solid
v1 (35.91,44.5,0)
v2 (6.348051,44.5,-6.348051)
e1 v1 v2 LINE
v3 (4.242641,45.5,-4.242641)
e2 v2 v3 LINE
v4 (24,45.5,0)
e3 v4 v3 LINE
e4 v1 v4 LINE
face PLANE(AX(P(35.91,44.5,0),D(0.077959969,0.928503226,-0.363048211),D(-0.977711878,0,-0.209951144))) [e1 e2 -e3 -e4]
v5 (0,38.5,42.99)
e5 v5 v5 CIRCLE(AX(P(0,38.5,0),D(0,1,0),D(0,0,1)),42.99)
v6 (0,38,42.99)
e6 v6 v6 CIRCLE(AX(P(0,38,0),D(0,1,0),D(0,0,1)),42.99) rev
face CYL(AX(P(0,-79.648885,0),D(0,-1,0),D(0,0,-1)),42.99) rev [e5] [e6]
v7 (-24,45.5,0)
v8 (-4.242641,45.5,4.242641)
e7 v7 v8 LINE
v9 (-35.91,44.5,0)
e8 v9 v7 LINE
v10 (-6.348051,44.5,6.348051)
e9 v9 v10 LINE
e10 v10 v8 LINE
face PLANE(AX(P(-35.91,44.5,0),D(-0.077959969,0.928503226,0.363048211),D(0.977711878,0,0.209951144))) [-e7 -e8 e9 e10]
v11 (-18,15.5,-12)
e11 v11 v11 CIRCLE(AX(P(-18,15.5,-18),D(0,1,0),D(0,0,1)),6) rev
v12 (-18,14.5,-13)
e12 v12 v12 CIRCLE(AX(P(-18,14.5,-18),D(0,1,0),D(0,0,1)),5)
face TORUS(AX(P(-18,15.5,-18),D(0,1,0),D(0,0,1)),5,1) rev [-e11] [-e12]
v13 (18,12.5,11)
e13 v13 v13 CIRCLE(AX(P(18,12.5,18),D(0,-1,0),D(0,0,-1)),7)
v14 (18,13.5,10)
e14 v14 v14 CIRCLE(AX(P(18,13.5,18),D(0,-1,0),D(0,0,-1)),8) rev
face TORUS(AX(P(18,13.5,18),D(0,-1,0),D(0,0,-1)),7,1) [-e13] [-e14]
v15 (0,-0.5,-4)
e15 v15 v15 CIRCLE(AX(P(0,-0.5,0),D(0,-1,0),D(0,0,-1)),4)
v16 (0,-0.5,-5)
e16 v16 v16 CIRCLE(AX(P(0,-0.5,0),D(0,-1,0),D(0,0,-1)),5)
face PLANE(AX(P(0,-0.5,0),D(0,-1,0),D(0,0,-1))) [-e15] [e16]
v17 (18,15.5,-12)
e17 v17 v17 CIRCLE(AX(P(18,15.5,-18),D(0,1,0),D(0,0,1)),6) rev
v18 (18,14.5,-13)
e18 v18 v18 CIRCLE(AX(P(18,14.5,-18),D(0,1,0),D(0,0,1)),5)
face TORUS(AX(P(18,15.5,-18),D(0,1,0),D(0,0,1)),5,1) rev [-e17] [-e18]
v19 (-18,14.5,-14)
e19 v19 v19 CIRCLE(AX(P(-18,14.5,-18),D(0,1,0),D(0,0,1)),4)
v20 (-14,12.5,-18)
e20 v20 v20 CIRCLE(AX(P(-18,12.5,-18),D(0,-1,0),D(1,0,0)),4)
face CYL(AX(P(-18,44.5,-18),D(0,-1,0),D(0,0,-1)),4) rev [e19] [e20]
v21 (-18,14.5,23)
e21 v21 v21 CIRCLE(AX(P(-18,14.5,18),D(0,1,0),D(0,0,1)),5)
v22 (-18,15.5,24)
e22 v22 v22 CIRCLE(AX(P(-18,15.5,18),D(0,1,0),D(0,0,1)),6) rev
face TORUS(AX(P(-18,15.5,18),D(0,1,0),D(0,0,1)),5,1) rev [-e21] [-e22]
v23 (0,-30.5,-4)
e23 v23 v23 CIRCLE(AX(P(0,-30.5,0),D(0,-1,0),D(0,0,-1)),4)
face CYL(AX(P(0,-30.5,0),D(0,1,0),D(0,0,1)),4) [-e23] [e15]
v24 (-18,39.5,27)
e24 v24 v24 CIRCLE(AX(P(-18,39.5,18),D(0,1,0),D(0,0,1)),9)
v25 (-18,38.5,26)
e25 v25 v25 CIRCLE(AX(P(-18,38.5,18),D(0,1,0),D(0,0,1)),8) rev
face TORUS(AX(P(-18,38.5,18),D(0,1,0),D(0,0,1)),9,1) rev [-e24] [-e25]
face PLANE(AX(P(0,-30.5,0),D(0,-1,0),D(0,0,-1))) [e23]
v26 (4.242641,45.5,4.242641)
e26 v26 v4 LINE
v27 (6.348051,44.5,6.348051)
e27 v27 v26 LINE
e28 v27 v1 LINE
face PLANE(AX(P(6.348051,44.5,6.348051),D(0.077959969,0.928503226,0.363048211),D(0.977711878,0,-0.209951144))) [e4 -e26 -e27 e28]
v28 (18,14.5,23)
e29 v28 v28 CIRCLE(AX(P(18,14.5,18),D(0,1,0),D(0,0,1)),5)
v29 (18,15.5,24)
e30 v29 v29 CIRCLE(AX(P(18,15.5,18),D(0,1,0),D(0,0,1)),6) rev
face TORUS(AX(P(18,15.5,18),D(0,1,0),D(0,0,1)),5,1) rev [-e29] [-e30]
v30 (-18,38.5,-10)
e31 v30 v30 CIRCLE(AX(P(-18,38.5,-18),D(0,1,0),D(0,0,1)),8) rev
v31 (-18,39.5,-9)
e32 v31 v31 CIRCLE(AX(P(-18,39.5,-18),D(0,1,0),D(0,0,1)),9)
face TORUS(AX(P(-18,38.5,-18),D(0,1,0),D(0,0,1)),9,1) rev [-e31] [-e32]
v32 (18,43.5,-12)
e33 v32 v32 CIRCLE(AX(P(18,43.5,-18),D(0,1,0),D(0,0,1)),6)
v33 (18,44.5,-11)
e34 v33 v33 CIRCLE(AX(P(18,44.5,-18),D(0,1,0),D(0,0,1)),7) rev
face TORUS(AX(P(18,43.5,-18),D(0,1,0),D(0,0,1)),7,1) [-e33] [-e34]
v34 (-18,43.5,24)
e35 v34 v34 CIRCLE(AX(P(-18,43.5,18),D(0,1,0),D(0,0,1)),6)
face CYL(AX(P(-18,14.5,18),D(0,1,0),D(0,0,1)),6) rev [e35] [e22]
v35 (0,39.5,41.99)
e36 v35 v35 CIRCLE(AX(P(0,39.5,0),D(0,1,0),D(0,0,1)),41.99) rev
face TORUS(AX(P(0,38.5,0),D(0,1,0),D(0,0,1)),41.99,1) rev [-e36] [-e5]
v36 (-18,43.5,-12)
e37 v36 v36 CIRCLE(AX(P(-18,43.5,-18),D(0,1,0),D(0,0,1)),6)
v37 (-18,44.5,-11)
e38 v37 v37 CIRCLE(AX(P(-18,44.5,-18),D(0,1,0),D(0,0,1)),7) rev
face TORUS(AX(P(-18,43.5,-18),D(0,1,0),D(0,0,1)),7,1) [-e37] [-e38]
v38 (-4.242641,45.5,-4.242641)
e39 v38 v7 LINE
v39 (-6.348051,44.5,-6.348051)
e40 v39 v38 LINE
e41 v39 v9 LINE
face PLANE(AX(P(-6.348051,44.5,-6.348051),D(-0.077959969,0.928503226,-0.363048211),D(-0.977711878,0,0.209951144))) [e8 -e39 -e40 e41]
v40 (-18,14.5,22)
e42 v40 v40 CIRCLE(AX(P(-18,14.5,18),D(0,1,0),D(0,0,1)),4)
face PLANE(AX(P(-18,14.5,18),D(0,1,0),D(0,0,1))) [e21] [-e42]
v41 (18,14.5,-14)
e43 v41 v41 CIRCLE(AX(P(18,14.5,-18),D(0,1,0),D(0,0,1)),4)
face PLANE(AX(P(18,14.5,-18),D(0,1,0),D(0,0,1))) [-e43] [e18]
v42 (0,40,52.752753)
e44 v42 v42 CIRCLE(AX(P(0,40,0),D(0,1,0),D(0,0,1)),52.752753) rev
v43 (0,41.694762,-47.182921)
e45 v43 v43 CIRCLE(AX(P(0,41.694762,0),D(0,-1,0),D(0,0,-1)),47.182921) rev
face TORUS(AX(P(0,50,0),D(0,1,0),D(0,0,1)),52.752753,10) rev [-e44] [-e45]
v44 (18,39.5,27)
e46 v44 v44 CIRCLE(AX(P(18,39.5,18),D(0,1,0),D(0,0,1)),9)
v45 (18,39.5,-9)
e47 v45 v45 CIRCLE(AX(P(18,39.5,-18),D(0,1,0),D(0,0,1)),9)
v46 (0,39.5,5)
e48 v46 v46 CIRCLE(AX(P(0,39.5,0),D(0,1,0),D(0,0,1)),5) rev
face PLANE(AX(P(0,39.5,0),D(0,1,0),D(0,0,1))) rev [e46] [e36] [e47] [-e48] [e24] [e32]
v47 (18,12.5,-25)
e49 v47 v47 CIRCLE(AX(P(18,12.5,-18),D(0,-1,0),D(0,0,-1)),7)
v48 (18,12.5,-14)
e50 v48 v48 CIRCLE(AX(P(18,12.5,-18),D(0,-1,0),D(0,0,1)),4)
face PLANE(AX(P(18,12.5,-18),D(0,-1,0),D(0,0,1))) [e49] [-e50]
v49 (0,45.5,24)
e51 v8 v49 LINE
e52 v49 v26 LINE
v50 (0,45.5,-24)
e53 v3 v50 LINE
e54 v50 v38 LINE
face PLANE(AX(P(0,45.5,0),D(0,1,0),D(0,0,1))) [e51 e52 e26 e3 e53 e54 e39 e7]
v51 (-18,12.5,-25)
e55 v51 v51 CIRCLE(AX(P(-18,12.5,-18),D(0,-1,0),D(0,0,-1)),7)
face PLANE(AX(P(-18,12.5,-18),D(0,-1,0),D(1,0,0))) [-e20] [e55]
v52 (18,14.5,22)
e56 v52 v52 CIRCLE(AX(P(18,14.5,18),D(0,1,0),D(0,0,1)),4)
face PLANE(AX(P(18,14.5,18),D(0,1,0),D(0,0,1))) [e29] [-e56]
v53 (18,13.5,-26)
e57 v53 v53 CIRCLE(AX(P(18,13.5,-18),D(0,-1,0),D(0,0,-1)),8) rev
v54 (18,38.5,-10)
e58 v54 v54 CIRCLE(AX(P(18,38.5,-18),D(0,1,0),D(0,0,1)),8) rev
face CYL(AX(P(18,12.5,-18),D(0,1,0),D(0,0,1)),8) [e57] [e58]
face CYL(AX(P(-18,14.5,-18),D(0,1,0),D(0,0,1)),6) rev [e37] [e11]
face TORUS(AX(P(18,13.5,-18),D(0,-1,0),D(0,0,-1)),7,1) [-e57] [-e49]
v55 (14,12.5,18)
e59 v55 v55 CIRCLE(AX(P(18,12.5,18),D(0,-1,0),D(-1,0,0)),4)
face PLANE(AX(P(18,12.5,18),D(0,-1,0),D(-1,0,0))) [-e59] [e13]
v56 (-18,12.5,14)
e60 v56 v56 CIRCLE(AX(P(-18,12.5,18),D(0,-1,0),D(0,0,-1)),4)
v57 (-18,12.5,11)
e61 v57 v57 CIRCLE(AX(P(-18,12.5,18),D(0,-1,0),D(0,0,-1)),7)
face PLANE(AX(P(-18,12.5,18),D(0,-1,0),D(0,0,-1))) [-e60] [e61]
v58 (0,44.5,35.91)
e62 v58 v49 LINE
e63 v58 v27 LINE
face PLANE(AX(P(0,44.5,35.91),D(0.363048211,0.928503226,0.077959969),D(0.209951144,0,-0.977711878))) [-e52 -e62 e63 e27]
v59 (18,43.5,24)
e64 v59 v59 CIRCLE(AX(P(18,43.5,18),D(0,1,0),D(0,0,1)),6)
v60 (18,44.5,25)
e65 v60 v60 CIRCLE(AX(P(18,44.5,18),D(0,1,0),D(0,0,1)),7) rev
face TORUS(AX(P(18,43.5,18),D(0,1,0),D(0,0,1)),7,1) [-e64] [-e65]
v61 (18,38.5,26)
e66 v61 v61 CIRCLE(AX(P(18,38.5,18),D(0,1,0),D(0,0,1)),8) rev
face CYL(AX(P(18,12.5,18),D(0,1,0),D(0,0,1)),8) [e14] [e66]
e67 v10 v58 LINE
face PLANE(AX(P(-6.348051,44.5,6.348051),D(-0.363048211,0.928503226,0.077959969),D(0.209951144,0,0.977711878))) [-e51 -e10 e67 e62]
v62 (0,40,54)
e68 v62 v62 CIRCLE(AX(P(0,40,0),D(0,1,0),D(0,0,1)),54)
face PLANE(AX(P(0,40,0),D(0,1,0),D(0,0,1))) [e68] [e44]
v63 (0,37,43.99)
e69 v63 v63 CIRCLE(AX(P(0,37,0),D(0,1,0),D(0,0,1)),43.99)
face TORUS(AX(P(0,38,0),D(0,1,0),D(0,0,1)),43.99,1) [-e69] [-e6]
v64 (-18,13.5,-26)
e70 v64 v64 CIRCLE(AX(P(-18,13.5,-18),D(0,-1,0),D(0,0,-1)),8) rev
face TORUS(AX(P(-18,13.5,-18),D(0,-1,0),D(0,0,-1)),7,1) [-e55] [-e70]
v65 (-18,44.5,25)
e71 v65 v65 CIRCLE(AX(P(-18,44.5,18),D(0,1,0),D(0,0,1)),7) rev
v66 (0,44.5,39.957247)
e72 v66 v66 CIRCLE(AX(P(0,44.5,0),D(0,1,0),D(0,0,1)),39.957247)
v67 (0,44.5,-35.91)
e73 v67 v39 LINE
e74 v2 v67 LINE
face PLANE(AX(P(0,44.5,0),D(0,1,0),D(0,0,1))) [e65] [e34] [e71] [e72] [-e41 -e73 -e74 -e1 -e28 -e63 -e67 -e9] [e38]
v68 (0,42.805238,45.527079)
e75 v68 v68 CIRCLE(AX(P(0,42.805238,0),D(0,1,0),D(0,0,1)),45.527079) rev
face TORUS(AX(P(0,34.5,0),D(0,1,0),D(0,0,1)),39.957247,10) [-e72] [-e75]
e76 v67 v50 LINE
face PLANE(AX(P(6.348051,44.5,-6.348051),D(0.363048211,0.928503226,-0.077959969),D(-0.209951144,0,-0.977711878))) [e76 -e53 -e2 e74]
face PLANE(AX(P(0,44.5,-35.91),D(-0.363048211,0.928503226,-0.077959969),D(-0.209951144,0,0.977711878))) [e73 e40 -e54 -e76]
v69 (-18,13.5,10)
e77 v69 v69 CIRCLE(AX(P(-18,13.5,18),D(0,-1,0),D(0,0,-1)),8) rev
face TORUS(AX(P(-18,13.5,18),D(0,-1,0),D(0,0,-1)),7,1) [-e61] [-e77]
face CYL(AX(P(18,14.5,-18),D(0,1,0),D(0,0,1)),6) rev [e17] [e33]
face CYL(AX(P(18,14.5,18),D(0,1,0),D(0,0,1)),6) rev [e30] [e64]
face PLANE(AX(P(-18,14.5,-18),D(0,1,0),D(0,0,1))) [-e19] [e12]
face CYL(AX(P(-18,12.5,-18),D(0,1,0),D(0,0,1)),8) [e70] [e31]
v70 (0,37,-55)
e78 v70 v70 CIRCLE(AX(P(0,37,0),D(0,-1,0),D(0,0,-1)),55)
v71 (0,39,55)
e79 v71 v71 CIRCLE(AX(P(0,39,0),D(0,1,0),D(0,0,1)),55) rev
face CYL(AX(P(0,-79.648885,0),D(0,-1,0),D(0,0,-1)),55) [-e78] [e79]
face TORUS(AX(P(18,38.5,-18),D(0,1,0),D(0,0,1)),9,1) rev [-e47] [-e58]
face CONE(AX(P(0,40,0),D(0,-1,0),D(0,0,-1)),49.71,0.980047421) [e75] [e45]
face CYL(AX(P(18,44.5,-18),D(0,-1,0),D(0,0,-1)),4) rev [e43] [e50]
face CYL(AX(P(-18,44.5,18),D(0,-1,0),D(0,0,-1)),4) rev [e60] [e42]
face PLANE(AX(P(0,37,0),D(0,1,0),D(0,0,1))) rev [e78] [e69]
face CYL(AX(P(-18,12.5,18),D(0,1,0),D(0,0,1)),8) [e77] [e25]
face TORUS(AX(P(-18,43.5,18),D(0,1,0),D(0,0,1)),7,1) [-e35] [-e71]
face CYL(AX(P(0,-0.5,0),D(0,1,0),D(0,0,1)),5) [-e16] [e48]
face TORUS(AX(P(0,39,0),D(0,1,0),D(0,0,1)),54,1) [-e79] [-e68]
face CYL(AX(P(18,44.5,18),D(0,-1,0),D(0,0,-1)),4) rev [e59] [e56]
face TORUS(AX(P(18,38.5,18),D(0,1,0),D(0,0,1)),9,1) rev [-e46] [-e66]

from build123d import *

# Parameters (mm, degrees)
FILLET1_R                = 10
FILLET2_R                = 1
SKETCH2_R                = 8
BOSS_EXTRUDE1_DEPTH      = 27
CUT_EXTRUDE1_START       = -5
SKETCH2_3_R              = 6
CUT_EXTRUDE1_DEPTH       = 30
SKETCH2_4_R              = 4
CUT_EXTRUDE2_DEPTH       = 83.334682917
FILLET3_R                = 1
CIRPATTERN1_COUNT        = 4
FILLET3_OF_CIRPATTERN1_R = 1
SKETCH3_R                = 5
BOSS_EXTRUDE2_DEPTH      = 40
BOSS_EXTRUDE3_START      = 40
SKETCH3_3_R              = 4
BOSS_EXTRUDE3_DEPTH      = 30
BOUNDARY1_DEPTH          = 1
BOUNDARY1_DRAFT          = 68.2026845
FILLET4_R                = 1
FILLET5_R                = 1


# Read off the part's stored shape, not the designer's step: Boundary1
with BuildPart() as part:
    # Sketch1 → Revolve1 (revolve)
    with BuildSketch(Plane.YZ, mode=Mode.PRIVATE) as revolve1_sk:
        Polygon((39.5, 42.99), (39.5, 0), (44.5, 0), (44.5, 43), (40, 49.71), (40, 55), (37, 55), (37, 42.99), align=None)
    revolve(revolve1_sk.sketch.rotate(Axis((0, -79.648884709, 0), (0, 1, 0)), 180), axis=Axis((0, -79.648884709, 0), (0, 1, 0)))

    # Fillet1
    fillet1_edges = [part.edges().sort_by_distance(p)[0] for p in [
        (0, 44.5, 43),
        (0, 40, 49.71),
    ]]
    fillet(fillet1_edges, radius=FILLET1_R)

    # Fillet2
    fillet2_edges = [part.edges().sort_by_distance(p)[0] for p in [
        (0, 40, 55),
    ]]
    fillet(fillet2_edges, radius=FILLET2_R)

    # Sketch2 → Boss-Extrude1 (add)
    with BuildSketch(Plane.XZ.offset(-39.5)):
        with Locations(Location((-18, 18, 0), (0, 0, 90))):
            Circle(SKETCH2_R)
    boss_extrude1 = extrude(amount=BOSS_EXTRUDE1_DEPTH)

    # Sketch2<3> → Cut-Extrude1 (cut)
    with BuildSketch(Plane.XZ.offset(-39.5).offset(CUT_EXTRUDE1_START)):
        with Locations(Location((-18, 18, 0), (0, 0, 90))):
            Circle(SKETCH2_3_R)
    cut_extrude1 = extrude(amount=CUT_EXTRUDE1_DEPTH, mode=Mode.SUBTRACT)

    # Sketch2<4> → Cut-Extrude2 (cut, symmetric)
    with BuildSketch(Plane.XZ.offset(-39.5)):
        with Locations(Location((-18, 18, 0), (0, 0, 270))):
            Circle(SKETCH2_4_R)
    cut_extrude2 = extrude(amount=CUT_EXTRUDE2_DEPTH, both=True, mode=Mode.SUBTRACT)

    # Fillet3
    fillet3_edges = [part.edges().sort_by_distance(p)[0] for p in [
        (-18, 12.5, 10),
        (-18, 14.5, 12),
        (-18, 44.5, 12),
    ]]
    fillet(fillet3_edges, radius=FILLET3_R)

    # CirPattern1: Boss-Extrude1, Cut-Extrude1, Cut-Extrude2 ×4 about axis
    cirpattern1_axis = Axis((0, 0, 0), (0, 1, 0))
    add([boss_extrude1.rotate(cirpattern1_axis, i * 360 / CIRPATTERN1_COUNT) for i in range(1, CIRPATTERN1_COUNT)])
    add([cut_extrude1.rotate(cirpattern1_axis, i * 360 / CIRPATTERN1_COUNT) for i in range(1, CIRPATTERN1_COUNT)], mode=Mode.SUBTRACT)
    add([cut_extrude2.rotate(cirpattern1_axis, i * 360 / CIRPATTERN1_COUNT) for i in range(1, CIRPATTERN1_COUNT)], mode=Mode.SUBTRACT)

    # Fillet3 of CirPattern1
    fillet3_of_cirpattern1_edges = [part.edges().sort_by_distance(p)[0] for p in [
        (10, 12.5, 18),
        (12, 14.5, 18),
        (12, 44.5, 18),
        (18, 12.5, -10),
        (18, 14.5, -12),
        (18, 44.5, -12),
        (-10, 12.5, -18),
        (-12, 14.5, -18),
        (-12, 44.5, -18),
    ]]
    fillet(fillet3_of_cirpattern1_edges, radius=FILLET3_OF_CIRPATTERN1_R)

    # Sketch3 → Boss-Extrude2 (add)
    with BuildSketch(Plane.XZ.offset(-39.5)):
        with Locations(Location((0, 0, 0), (0, 0, 90))):
            Circle(SKETCH3_R)
    extrude(amount=BOSS_EXTRUDE2_DEPTH)

    # Sketch3<3> → Boss-Extrude3 (add)
    with BuildSketch(Plane.XZ.offset(-39.5).offset(BOSS_EXTRUDE3_START)):
        with Locations(Location((0, 0, 0), (0, 0, 270))):
            Circle(SKETCH3_3_R)
    extrude(amount=BOSS_EXTRUDE3_DEPTH)


with BuildPart() as boundary1_tool:
    # Boundary1 outline → Boundary1 (with draft: the straight prism first)
    with BuildSketch(Plane(origin=(0, 45.5, 0), x_dir=(1, 0, 0), z_dir=(0, 1, 0))):
        Polygon((24, 0), (4.242640687, 4.242640687), (0, 24), (-4.242640687, 4.242640687), (-24, 0), (-4.242640687, -4.242640687), (0, -24), (4.242640687, -4.242640687), align=None)
    extrude(amount=-BOUNDARY1_DEPTH)
    # Boundary1: the draft: its side faces are tilted about the plane it starts from
    boundary1_sides = [boundary1_tool.faces().sort_by_distance(p)[0] for p in [
        (14.121320343, 45, -2.121320343),
        (2.121320343, 45, -14.121320343),
        (-2.121320343, 45, -14.121320343),
        (-14.121320343, 45, -2.121320343),
        (-14.121320343, 45, 2.121320343),
        (-2.121320343, 45, 14.121320343),
        (2.121320343, 45, 14.121320343),
        (14.121320343, 45, 2.121320343),
    ]]
    draft(boundary1_sides, Plane(origin=(0, 45.5, 0), x_dir=(1, 0, 0), z_dir=(0, 1, 0)), BOUNDARY1_DRAFT)


with BuildPart() as part_1:
    add(part.part)

    # Boundary1: add boundary1_tool
    add(boundary1_tool.part)

    # Fillet4
    fillet4_edges = [part_1.edges().sort_by_distance(p)[0] for p in [
        (0, 39.5, 42.99),
        (0, 37, 42.99),
    ]]
    fillet(fillet4_edges, radius=FILLET4_R)

    # Fillet5
    fillet5_edges = [part_1.edges().sort_by_distance(p)[0] for p in [
        (-18, 39.5, 10),
        (10, 39.5, 18),
        (18, 39.5, -10),
        (-10, 39.5, -18),
    ]]
    fillet(fillet5_edges, radius=FILLET5_R)


solid = part_1.part
